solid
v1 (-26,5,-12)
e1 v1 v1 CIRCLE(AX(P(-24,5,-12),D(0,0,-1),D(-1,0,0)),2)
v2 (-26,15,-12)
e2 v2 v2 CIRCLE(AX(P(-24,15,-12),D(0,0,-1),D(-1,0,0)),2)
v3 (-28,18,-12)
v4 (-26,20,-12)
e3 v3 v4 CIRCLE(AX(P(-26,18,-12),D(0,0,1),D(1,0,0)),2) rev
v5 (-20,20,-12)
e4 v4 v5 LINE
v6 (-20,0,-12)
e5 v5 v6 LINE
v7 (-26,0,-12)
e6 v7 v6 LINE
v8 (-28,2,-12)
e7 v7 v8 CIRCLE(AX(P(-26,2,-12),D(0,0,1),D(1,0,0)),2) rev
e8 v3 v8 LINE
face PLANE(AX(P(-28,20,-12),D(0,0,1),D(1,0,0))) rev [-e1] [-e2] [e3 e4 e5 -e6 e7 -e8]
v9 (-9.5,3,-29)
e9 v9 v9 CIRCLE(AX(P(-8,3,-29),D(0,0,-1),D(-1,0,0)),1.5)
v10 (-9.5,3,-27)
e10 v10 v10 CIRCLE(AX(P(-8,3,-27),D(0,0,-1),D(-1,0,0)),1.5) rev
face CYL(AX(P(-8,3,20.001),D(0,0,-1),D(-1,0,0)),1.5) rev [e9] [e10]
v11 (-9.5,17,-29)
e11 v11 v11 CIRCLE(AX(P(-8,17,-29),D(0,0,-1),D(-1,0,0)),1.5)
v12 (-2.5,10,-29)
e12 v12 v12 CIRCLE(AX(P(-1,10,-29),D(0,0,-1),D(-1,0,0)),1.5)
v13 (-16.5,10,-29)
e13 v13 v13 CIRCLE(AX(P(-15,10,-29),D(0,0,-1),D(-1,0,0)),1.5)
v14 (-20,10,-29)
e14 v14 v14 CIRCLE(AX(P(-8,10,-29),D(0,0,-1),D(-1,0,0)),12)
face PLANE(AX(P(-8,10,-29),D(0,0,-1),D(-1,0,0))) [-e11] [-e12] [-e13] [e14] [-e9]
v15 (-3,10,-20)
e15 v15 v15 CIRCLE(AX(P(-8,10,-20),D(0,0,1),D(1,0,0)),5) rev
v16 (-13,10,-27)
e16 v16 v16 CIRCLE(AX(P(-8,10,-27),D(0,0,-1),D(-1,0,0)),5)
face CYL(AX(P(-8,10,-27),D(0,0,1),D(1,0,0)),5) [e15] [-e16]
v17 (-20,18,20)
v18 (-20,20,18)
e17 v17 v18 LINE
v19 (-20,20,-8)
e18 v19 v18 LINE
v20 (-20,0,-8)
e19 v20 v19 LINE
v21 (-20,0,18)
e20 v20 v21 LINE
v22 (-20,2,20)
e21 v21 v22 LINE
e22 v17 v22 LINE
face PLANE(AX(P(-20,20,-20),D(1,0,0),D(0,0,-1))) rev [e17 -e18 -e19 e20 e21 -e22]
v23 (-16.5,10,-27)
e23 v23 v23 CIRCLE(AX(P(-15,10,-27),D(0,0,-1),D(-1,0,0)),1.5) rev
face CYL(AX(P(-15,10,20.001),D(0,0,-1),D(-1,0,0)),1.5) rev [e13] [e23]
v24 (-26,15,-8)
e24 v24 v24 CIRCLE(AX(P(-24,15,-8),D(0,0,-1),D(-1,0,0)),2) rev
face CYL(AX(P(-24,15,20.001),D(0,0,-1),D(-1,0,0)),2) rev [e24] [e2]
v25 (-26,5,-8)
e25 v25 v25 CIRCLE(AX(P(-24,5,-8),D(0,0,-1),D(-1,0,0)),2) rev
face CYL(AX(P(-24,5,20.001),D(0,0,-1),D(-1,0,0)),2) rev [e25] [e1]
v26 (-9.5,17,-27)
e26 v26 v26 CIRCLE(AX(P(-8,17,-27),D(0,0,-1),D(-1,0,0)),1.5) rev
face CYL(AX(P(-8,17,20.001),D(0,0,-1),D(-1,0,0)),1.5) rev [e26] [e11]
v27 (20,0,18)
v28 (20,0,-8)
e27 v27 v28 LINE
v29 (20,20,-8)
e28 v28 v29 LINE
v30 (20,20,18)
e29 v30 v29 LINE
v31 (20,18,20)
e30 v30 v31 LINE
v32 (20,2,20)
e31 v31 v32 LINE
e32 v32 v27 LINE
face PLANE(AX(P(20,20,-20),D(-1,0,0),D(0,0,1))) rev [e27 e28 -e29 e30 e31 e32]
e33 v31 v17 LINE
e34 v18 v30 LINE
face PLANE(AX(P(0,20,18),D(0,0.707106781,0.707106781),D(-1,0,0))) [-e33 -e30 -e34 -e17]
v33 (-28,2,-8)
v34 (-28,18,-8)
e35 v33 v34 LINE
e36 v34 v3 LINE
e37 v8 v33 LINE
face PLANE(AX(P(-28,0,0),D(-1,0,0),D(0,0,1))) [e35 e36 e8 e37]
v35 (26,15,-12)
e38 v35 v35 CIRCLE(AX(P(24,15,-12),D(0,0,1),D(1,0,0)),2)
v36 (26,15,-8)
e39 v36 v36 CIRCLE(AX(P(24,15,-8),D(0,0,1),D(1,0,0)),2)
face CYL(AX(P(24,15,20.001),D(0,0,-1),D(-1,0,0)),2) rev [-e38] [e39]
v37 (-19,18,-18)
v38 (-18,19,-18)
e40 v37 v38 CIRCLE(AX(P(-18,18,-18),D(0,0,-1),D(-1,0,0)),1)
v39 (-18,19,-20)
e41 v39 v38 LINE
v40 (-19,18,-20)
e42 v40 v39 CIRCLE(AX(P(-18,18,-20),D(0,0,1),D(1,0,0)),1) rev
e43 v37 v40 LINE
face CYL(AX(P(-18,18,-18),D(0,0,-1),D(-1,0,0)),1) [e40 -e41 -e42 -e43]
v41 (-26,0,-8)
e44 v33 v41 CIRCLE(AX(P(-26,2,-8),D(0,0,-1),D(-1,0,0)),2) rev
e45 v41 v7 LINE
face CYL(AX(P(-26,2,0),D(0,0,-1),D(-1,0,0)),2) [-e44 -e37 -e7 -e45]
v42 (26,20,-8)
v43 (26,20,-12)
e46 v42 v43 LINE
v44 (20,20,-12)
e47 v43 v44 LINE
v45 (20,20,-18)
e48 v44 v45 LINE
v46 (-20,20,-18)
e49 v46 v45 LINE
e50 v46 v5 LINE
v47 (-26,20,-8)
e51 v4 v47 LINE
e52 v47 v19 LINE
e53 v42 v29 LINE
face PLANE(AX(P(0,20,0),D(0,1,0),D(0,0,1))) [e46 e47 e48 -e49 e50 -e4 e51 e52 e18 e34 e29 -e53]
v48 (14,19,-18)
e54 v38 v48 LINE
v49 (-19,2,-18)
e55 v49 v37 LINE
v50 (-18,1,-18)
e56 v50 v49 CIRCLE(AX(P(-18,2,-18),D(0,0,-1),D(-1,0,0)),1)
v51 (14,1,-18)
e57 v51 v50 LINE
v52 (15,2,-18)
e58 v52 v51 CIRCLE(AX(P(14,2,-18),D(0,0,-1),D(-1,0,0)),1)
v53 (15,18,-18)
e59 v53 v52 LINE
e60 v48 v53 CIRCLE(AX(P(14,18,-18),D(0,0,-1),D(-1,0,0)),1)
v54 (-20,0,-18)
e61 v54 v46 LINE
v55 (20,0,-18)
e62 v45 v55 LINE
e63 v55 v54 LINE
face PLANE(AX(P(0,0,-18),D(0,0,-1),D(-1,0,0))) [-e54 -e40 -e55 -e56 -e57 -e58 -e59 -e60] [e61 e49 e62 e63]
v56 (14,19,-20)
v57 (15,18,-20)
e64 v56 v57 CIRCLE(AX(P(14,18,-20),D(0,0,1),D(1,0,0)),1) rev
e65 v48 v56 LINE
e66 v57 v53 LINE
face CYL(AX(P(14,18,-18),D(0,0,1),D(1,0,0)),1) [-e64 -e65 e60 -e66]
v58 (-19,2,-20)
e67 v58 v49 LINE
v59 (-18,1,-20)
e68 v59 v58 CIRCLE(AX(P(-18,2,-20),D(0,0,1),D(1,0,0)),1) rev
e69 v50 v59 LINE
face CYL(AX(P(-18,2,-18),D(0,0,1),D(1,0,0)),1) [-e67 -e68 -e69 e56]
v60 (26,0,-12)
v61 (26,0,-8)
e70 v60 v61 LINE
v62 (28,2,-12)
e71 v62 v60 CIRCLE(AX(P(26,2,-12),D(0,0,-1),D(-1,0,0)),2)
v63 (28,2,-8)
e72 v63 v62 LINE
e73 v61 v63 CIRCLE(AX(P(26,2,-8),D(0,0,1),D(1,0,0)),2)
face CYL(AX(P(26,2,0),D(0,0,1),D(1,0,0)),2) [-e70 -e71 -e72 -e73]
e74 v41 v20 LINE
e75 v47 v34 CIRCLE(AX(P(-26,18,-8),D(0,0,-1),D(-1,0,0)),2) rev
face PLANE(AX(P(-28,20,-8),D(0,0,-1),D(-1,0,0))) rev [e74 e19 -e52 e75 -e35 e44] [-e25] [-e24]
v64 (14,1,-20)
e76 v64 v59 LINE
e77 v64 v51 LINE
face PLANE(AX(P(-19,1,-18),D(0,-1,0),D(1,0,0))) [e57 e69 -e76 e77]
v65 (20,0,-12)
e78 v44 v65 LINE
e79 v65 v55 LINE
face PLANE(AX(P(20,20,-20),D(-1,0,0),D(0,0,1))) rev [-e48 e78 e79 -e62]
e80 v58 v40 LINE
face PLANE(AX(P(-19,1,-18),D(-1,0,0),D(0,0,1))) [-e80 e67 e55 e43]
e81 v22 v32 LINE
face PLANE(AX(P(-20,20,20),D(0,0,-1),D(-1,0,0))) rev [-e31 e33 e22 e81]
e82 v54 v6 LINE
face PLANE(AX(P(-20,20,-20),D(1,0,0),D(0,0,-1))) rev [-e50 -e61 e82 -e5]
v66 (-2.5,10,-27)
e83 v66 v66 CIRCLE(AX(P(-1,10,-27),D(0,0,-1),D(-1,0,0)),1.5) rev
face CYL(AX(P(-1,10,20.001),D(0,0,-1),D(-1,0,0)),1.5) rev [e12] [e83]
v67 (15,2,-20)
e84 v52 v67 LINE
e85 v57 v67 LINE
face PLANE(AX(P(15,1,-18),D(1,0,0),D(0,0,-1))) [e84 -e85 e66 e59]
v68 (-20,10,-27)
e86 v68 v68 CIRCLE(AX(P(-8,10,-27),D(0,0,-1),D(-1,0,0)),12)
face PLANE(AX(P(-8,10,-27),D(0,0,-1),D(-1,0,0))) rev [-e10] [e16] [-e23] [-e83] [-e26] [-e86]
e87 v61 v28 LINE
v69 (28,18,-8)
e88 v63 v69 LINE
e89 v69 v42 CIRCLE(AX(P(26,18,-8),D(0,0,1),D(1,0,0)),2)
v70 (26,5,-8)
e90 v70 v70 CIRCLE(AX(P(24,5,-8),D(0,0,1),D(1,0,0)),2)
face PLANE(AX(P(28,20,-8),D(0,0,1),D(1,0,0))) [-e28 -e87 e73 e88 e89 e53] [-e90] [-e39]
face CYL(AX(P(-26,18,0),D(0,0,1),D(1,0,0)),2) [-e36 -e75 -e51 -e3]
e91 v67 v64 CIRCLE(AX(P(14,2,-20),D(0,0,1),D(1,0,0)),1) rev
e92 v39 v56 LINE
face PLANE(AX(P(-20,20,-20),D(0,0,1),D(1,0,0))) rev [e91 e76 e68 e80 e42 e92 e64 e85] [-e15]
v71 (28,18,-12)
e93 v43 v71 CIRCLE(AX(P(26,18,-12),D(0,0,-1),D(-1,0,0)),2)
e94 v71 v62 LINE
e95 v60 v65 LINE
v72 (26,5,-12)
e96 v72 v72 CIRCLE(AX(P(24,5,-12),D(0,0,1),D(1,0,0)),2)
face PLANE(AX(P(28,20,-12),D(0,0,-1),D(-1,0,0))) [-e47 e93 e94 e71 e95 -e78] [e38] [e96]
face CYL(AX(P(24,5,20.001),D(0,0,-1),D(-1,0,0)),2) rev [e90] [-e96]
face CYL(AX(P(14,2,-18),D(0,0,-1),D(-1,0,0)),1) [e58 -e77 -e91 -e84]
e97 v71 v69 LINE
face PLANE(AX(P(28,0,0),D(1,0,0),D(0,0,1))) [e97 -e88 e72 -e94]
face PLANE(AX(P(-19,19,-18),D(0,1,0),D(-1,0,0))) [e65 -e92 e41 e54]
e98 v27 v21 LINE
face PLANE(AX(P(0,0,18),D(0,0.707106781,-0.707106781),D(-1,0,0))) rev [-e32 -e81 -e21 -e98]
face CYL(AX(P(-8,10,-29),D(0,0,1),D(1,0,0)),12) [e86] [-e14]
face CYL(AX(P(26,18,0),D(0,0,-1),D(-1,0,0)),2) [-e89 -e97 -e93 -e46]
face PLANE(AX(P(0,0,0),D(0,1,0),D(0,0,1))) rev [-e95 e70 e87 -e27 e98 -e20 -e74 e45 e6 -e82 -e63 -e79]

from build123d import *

# Parameters (mm, degrees)
SKETCH_1_W             = 40
SKETCH_1_H             = 40
EXTRUDE_1_DEPTH        = 20
CHAMFER_1_SIZE         = 2
CHAMFER_2_SIZE         = 2
SKETCH_2_W             = 40
SKETCH_2_H             = 20
SKETCH_2_W_2           = 34
SKETCH_2_H_2           = 18
CUT_EXTRUDE_1_DEPTH    = 2
FILLET_1_R             = 1
FILLET_2_R             = 1
FILLET_3_R             = 1
FILLET_4_R             = 1
SKETCH_3_R             = 5
EXTRUDE_2_DEPTH        = 7
SKETCH_4_R             = 12
EXTRUDE_3_DEPTH        = 2
CUT_EXTRUDE_2_REACH    = 59.315
SKETCH_5_R             = 1.5
SKETCH_6_W             = 4
SKETCH_6_H             = 20
EXTRUDE_4_DEPTH        = 8
CUT_EXTRUDE_3_REACH    = 49.875
SKETCH_7_R             = 2
FILLET_5_R             = 2
FILLET_6_R             = 2
FILLET_5_OF_MIRROR_1_R = 2
FILLET_6_OF_MIRROR_1_R = 2


with BuildPart() as part:
    # 草图1 → 凸台-拉伸1 (new body)
    with BuildSketch(Plane(origin=(0, 0, 0), x_dir=(1, 0, 0), z_dir=(0, 1, 0))):
        Rectangle(SKETCH_1_W, SKETCH_1_H)
    extrude(amount=EXTRUDE_1_DEPTH)

    # Chamfer 1
    chamfer_1_edges = [part.edges().sort_by_distance(p)[0] for p in [
        (0, 0, 20),
    ]]
    chamfer(chamfer_1_edges, length=CHAMFER_1_SIZE)

    # Chamfer 2
    chamfer_2_edges = [part.edges().sort_by_distance(p)[0] for p in [
        (0, 20, 20),
    ]]
    chamfer(chamfer_2_edges, length=CHAMFER_2_SIZE)

    # 草图2 → 切除-拉伸1 (cut)
    with BuildSketch(Plane(origin=(0, 0, -20), x_dir=(-1, 0, 0), z_dir=(0, 0, -1))):
        with Locations((0, 10)):
            Rectangle(SKETCH_2_W, SKETCH_2_H)
        with Locations((2, 10)):
            Rectangle(SKETCH_2_W_2, SKETCH_2_H_2, mode=Mode.SUBTRACT)
    extrude(amount=-CUT_EXTRUDE_1_DEPTH, mode=Mode.SUBTRACT)

    # Fillet 1
    fillet_1_edges = [part.edges().sort_by_distance(p)[0] for p in [
        (15, 1, -19),
    ]]
    fillet(fillet_1_edges, radius=FILLET_1_R)

    # Fillet 2
    fillet_2_edges = [part.edges().sort_by_distance(p)[0] for p in [
        (15, 19, -19),
    ]]
    fillet(fillet_2_edges, radius=FILLET_2_R)

    # 圆角3
    fillet_3_edges = [part.edges().sort_by_distance(p)[0] for p in [
        (-19, 1, -19),
    ]]
    fillet(fillet_3_edges, radius=FILLET_3_R)

    # 圆角4
    fillet_4_edges = [part.edges().sort_by_distance(p)[0] for p in [
        (-19, 19, -19),
    ]]
    fillet(fillet_4_edges, radius=FILLET_4_R)

    # 草图3 → 凸台-拉伸2 (add)
    with BuildSketch(Plane(origin=(0, 0, -20), x_dir=(-1, 0, 0), z_dir=(0, 0, -1))):
        with Locations((8, 10)):
            Circle(SKETCH_3_R)
    extrude(amount=EXTRUDE_2_DEPTH)

    # 草图4 → 凸台-拉伸3 (add)
    with BuildSketch(Plane(origin=(0, 0, -27), x_dir=(-1, 0, 0), z_dir=(0, 0, -1))):
        with Locations((8, 10)):
            Circle(SKETCH_4_R)
    extrude(amount=EXTRUDE_3_DEPTH)

    # 草图5 → 切除-拉伸2 (cut, up to next)
    with BuildSketch(Plane(origin=(0, 0, -29), x_dir=(-1, 0, 0), z_dir=(0, 0, -1)), mode=Mode.PRIVATE) as cut_extrude_2_sk1:
        with Locations((8, 17)):
            Circle(SKETCH_5_R)
    cut_extrude_2_tool1 = extrude(cut_extrude_2_sk1.sketch, amount=-CUT_EXTRUDE_2_REACH, mode=Mode.PRIVATE) & part.part
    # 草图5 → 切除-拉伸2 (cut, up to next)
    with BuildSketch(Plane(origin=(0, 0, -29), x_dir=(-1, 0, 0), z_dir=(0, 0, -1)), mode=Mode.PRIVATE) as cut_extrude_2_sk2:
        with Locations((15, 10)):
            Circle(SKETCH_5_R)
    cut_extrude_2_tool2 = extrude(cut_extrude_2_sk2.sketch, amount=-CUT_EXTRUDE_2_REACH, mode=Mode.PRIVATE) & part.part
    # 草图5 → 切除-拉伸2 (cut, up to next)
    with BuildSketch(Plane(origin=(0, 0, -29), x_dir=(-1, 0, 0), z_dir=(0, 0, -1)), mode=Mode.PRIVATE) as cut_extrude_2_sk3:
        with Locations((8, 3)):
            Circle(SKETCH_5_R)
    cut_extrude_2_tool3 = extrude(cut_extrude_2_sk3.sketch, amount=-CUT_EXTRUDE_2_REACH, mode=Mode.PRIVATE) & part.part
    # 草图5 → 切除-拉伸2 (cut, up to next)
    with BuildSketch(Plane(origin=(0, 0, -29), x_dir=(-1, 0, 0), z_dir=(0, 0, -1)), mode=Mode.PRIVATE) as cut_extrude_2_sk4:
        with Locations((1, 10)):
            Circle(SKETCH_5_R)
    cut_extrude_2_tool4 = extrude(cut_extrude_2_sk4.sketch, amount=-CUT_EXTRUDE_2_REACH, mode=Mode.PRIVATE) & part.part
    add(cut_extrude_2_tool1.solids().sort_by_distance((-8, 17, -29))[0], mode=Mode.SUBTRACT)
    add(cut_extrude_2_tool2.solids().sort_by_distance((-15, 10, -29))[0], mode=Mode.SUBTRACT)
    add(cut_extrude_2_tool3.solids().sort_by_distance((-8, 3, -29))[0], mode=Mode.SUBTRACT)
    add(cut_extrude_2_tool4.solids().sort_by_distance((-1, 10, -29))[0], mode=Mode.SUBTRACT)

    # 草图6 → 凸台-拉伸4 (add)
    with BuildSketch(Plane.ZY.offset(20)):
        with Locations((-10, 10)):
            Rectangle(SKETCH_6_W, SKETCH_6_H)
    extrude_4 = extrude(amount=EXTRUDE_4_DEPTH)

    # 草图7 → 切除-拉伸3 (cut, up to next)
    with BuildSketch(Plane(origin=(0, 0, -12), x_dir=(-1, 0, 0), z_dir=(0, 0, -1)), mode=Mode.PRIVATE) as cut_extrude_3_sk1:
        with Locations((24, 15)):
            Circle(SKETCH_7_R)
    cut_extrude_3_tool1 = extrude(cut_extrude_3_sk1.sketch, amount=-CUT_EXTRUDE_3_REACH, mode=Mode.PRIVATE) & part.part
    # 草图7 → 切除-拉伸3 (cut, up to next)
    with BuildSketch(Plane(origin=(0, 0, -12), x_dir=(-1, 0, 0), z_dir=(0, 0, -1)), mode=Mode.PRIVATE) as cut_extrude_3_sk2:
        with Locations((24, 5)):
            Circle(SKETCH_7_R)
    cut_extrude_3_tool2 = extrude(cut_extrude_3_sk2.sketch, amount=-CUT_EXTRUDE_3_REACH, mode=Mode.PRIVATE) & part.part
    cut_extrude_3_1 = cut_extrude_3_tool1.solids().sort_by_distance((-24, 15, -12))[0]
    add(cut_extrude_3_1, mode=Mode.SUBTRACT)
    cut_extrude_3_2 = cut_extrude_3_tool2.solids().sort_by_distance((-24, 5, -12))[0]
    add(cut_extrude_3_2, mode=Mode.SUBTRACT)
    cut_extrude_3 = cut_extrude_3_1 + cut_extrude_3_2  # 切除-拉伸3 as one shape, for the pattern or mirror that repeats it

    # 圆角5
    fillet_5_edges = [part.edges().sort_by_distance(p)[0] for p in [
        (-28, 20, -10),
    ]]
    fillet(fillet_5_edges, radius=FILLET_5_R)

    # 圆角6
    fillet_6_edges = [part.edges().sort_by_distance(p)[0] for p in [
        (-28, 0, -10),
    ]]
    fillet(fillet_6_edges, radius=FILLET_6_R)

    # 镜向1: 凸台-拉伸4, 切除-拉伸3 across plane
    add(extrude_4.mirror(Plane(origin=(0, 0, 0), x_dir=(0, 0, 1), z_dir=(1, 0, 0))))
    add(cut_extrude_3.mirror(Plane(origin=(0, 0, 0), x_dir=(0, 0, 1), z_dir=(1, 0, 0))), mode=Mode.SUBTRACT)

    # 圆角5 of 镜向1
    fillet_5_of_mirror_1_edges = [part.edges().sort_by_distance(p)[0] for p in [
        (28, 20, -10),
    ]]
    fillet(fillet_5_of_mirror_1_edges, radius=FILLET_5_OF_MIRROR_1_R)

    # 圆角6 of 镜向1
    fillet_6_of_mirror_1_edges = [part.edges().sort_by_distance(p)[0] for p in [
        (28, 0, -10),
    ]]
    fillet(fillet_6_of_mirror_1_edges, radius=FILLET_6_OF_MIRROR_1_R)


solid = part.part
